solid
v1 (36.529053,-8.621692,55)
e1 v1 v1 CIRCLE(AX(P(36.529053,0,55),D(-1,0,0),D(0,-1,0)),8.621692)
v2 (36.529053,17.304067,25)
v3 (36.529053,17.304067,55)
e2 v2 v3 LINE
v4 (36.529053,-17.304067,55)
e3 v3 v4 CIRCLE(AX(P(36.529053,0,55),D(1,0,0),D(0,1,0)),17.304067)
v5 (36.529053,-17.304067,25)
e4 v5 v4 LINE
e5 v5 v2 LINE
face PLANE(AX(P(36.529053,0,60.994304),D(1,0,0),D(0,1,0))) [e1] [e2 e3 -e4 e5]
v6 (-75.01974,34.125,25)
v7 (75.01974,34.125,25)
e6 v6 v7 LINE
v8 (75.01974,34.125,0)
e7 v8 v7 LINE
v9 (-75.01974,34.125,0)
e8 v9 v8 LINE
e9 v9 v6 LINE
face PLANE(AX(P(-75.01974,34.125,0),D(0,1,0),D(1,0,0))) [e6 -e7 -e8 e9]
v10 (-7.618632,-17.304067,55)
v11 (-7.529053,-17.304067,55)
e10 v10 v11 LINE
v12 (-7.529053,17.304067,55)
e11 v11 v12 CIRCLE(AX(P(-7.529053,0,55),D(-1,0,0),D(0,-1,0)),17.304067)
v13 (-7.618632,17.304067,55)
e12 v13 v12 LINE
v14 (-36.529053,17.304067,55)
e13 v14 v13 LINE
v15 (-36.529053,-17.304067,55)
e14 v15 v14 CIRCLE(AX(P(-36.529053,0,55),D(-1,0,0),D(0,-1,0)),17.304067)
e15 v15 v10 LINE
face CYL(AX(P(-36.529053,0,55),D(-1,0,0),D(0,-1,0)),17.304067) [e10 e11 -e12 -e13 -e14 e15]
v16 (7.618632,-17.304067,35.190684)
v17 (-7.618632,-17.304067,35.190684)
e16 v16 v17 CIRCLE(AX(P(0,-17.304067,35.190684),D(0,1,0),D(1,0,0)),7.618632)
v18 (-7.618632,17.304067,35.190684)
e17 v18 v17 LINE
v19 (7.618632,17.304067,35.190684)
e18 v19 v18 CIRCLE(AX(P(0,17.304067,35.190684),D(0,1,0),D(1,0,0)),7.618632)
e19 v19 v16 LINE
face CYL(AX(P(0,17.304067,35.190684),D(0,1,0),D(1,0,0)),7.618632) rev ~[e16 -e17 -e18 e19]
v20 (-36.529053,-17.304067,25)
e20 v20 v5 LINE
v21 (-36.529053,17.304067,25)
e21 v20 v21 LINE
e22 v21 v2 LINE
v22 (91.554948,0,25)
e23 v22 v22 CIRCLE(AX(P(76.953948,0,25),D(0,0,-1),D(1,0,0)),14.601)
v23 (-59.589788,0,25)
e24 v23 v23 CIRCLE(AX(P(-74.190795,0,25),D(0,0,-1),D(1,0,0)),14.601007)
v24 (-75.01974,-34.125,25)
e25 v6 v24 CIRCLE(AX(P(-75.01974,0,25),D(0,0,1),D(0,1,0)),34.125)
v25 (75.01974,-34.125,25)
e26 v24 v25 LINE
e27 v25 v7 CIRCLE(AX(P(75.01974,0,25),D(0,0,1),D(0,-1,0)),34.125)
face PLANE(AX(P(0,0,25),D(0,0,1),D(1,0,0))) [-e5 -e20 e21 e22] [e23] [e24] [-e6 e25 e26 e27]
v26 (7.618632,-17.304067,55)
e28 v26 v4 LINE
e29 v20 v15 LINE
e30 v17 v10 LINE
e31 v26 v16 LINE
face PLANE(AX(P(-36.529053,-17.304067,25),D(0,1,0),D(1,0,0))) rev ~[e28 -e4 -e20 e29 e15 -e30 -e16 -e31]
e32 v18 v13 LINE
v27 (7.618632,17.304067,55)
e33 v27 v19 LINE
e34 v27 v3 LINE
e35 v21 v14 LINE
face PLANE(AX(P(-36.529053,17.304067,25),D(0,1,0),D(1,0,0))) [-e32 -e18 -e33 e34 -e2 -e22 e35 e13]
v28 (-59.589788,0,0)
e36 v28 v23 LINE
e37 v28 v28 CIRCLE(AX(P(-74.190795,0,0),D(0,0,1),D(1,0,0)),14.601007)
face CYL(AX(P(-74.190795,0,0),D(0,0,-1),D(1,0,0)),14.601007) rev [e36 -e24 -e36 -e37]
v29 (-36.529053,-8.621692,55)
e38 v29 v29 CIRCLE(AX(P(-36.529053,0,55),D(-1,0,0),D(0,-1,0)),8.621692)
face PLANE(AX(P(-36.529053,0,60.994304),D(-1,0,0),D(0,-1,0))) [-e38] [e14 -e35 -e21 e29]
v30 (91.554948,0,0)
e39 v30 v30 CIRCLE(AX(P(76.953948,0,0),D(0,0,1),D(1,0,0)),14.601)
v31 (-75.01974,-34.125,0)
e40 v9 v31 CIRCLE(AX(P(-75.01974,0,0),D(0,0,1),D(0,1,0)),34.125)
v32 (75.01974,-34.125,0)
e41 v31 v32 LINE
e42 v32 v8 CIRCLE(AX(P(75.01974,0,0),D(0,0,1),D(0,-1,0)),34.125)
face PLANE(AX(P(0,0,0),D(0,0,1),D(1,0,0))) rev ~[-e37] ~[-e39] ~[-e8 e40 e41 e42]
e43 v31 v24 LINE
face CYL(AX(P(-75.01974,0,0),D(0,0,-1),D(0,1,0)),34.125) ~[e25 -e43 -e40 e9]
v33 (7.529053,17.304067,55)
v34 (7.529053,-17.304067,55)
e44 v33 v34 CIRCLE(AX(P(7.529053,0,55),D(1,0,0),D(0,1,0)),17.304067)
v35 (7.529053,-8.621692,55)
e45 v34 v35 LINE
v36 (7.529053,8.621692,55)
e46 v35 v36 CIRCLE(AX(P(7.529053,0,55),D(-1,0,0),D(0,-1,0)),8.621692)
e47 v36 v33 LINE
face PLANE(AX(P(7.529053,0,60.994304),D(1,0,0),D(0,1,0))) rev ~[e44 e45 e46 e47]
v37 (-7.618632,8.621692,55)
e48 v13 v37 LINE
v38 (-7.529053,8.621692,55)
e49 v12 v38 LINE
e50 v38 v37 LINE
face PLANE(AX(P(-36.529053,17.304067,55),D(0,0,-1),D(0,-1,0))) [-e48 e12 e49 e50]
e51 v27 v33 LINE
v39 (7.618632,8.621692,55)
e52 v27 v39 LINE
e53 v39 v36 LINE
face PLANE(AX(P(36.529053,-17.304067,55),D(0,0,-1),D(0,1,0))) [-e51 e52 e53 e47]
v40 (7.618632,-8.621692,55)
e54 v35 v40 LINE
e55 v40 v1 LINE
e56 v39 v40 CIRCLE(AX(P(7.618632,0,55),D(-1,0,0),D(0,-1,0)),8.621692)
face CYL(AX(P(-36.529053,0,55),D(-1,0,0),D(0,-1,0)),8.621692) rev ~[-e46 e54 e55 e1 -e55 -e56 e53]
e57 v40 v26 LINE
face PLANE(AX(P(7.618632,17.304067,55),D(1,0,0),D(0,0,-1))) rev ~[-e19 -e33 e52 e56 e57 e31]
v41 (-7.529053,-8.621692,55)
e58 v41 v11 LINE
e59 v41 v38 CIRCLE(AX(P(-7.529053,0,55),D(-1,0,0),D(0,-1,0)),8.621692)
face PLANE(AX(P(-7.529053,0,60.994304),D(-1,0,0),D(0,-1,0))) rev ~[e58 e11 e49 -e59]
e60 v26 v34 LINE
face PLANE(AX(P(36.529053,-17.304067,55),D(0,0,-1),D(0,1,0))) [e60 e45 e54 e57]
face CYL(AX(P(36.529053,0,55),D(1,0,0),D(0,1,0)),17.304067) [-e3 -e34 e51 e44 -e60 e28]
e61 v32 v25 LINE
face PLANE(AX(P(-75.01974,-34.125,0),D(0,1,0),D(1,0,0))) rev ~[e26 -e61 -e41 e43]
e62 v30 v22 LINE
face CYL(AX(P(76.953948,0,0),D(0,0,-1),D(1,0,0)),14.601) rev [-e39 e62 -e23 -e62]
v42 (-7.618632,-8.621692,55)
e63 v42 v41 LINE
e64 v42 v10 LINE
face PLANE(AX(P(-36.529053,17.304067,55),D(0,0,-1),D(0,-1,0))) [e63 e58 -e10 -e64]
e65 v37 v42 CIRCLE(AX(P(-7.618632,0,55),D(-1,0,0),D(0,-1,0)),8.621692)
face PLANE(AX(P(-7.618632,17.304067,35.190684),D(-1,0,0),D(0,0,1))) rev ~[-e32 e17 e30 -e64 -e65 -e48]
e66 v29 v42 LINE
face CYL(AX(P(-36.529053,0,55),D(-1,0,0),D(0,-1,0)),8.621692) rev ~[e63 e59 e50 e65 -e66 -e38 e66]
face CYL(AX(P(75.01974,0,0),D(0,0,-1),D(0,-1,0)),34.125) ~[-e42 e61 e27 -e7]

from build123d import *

# Parameters (mm, degrees)
F0_W      = 150.0394791365
F0_H      = 68.2500004768
F1_DEPTH  = 25
F2_R      = 14.6010069538
F2_R_2    = 14.601
F3_DEPTH  = 86
F4_W      = 73.0581060052
F4_H      = 34.6081331372
F5_DEPTH  = 30
F7_DEPTH  = 50
F9_DEPTH  = 29
F11_DEPTH = 29
F12_R     = 8.621691767
F13_DEPTH = 110.5


# Not quite as in the source:
# - a feature names something its author has since deleted; it is built from what else it names


with BuildPart() as f1:
    # F0 (on Top) → F1 (new body)
    with BuildSketch(Plane.XY):
        Rectangle(F0_W, F0_H)
        with BuildLine():
            Line((-75.0197395682, -34.1250002384), (-75.0197395682, 34.1250002384))
            ThreePointArc((-75.0197395682, 34.1250002384), (-109.1447398067, 0), (-75.0197395682, -34.1250002384))
        make_face()
        with BuildLine():
            ThreePointArc((75.0197395682, -34.1250002384), (109.1447398067, 0), (75.0197395682, 34.1250002384))
            Line((75.0197395682, 34.1250002384), (75.0197395682, -34.1250002384))
        make_face()
    extrude(amount=F1_DEPTH)

    # F2 (on Top) → F3 (cut)
    with BuildSketch(Plane.XY):
        with Locations((-74.1907954216, 0)):
            Circle(F2_R)
        with Locations((76.9539475441, 0)):
            Circle(F2_R_2)
    extrude(amount=F3_DEPTH, mode=Mode.SUBTRACT)

    # F4 (on face) → F5 (join)
    with BuildSketch(Plane.XY.offset(25)):
        Rectangle(F4_W, F4_H)
    extrude(amount=F5_DEPTH)

    # F6 (on face) → F7 (cut)
    with BuildSketch(Plane(origin=(0, 17.3040665686, 0), x_dir=(-1, 0, 0), z_dir=(0, 1, 0))):
        with BuildLine():
            ThreePointArc((-7.6186316787, 35.1906841607), (0, 27.572052482), (7.6186316787, 35.1906841607))
            Line((7.6186316787, 35.1906841607), (-7.6186316787, 35.1906841607))
        make_face()
        with BuildLine():
            Line((-7.6186316787, 35.1906841607), (7.6186316787, 35.1906841607))
            ThreePointArc((7.6186316787, 35.1906841607), (0, 42.8093158393), (-7.6186316787, 35.1906841607))
        make_face()
        with BuildLine():
            ThreePointArc((-7.6186316787, 35.1906841607), (0, 42.8093158393), (7.6186316787, 35.1906841607))
            Line((7.6186316787, 35.1906841607), (7.6186316787, 55))
            Line((7.6186316787, 55), (-7.6186316787, 55))
            Line((-7.6186316787, 55), (-7.6186316787, 35.1906841607))
        make_face()
    extrude(amount=-F7_DEPTH, mode=Mode.SUBTRACT)

    # F8 (on face) → F9 (join)
    with BuildSketch(Plane.YZ.offset(36.5290530026)):
        with BuildLine():
            Line((-17.3040665686, 55), (17.3040665686, 55))
            ThreePointArc((17.3040665686, 55), (0, 72.3040665686), (-17.3040665686, 55))
        make_face()
    extrude(amount=-F9_DEPTH)

    # F10 (on face) → F11 (join)
    with BuildSketch(Plane(origin=(-36.5290530026, 0, 0), x_dir=(0, -1, 0), z_dir=(-1, 0, 0))):
        with BuildLine():
            Line((-17.3040665686, 55), (17.3040665686, 55))
            ThreePointArc((17.3040665686, 55), (0, 72.3040665686), (-17.3040665686, 55))
        make_face()
    extrude(amount=-F11_DEPTH)

    # F12 (on face) → F13 (cut)
    with BuildSketch(Plane(origin=(-36.5290530026, 0, 0), x_dir=(0, -1, 0), z_dir=(-1, 0, 0))):
        with Locations((0, 55)):
            Circle(F12_R)
    extrude(amount=-F13_DEPTH, mode=Mode.SUBTRACT)


solid = f1.part
